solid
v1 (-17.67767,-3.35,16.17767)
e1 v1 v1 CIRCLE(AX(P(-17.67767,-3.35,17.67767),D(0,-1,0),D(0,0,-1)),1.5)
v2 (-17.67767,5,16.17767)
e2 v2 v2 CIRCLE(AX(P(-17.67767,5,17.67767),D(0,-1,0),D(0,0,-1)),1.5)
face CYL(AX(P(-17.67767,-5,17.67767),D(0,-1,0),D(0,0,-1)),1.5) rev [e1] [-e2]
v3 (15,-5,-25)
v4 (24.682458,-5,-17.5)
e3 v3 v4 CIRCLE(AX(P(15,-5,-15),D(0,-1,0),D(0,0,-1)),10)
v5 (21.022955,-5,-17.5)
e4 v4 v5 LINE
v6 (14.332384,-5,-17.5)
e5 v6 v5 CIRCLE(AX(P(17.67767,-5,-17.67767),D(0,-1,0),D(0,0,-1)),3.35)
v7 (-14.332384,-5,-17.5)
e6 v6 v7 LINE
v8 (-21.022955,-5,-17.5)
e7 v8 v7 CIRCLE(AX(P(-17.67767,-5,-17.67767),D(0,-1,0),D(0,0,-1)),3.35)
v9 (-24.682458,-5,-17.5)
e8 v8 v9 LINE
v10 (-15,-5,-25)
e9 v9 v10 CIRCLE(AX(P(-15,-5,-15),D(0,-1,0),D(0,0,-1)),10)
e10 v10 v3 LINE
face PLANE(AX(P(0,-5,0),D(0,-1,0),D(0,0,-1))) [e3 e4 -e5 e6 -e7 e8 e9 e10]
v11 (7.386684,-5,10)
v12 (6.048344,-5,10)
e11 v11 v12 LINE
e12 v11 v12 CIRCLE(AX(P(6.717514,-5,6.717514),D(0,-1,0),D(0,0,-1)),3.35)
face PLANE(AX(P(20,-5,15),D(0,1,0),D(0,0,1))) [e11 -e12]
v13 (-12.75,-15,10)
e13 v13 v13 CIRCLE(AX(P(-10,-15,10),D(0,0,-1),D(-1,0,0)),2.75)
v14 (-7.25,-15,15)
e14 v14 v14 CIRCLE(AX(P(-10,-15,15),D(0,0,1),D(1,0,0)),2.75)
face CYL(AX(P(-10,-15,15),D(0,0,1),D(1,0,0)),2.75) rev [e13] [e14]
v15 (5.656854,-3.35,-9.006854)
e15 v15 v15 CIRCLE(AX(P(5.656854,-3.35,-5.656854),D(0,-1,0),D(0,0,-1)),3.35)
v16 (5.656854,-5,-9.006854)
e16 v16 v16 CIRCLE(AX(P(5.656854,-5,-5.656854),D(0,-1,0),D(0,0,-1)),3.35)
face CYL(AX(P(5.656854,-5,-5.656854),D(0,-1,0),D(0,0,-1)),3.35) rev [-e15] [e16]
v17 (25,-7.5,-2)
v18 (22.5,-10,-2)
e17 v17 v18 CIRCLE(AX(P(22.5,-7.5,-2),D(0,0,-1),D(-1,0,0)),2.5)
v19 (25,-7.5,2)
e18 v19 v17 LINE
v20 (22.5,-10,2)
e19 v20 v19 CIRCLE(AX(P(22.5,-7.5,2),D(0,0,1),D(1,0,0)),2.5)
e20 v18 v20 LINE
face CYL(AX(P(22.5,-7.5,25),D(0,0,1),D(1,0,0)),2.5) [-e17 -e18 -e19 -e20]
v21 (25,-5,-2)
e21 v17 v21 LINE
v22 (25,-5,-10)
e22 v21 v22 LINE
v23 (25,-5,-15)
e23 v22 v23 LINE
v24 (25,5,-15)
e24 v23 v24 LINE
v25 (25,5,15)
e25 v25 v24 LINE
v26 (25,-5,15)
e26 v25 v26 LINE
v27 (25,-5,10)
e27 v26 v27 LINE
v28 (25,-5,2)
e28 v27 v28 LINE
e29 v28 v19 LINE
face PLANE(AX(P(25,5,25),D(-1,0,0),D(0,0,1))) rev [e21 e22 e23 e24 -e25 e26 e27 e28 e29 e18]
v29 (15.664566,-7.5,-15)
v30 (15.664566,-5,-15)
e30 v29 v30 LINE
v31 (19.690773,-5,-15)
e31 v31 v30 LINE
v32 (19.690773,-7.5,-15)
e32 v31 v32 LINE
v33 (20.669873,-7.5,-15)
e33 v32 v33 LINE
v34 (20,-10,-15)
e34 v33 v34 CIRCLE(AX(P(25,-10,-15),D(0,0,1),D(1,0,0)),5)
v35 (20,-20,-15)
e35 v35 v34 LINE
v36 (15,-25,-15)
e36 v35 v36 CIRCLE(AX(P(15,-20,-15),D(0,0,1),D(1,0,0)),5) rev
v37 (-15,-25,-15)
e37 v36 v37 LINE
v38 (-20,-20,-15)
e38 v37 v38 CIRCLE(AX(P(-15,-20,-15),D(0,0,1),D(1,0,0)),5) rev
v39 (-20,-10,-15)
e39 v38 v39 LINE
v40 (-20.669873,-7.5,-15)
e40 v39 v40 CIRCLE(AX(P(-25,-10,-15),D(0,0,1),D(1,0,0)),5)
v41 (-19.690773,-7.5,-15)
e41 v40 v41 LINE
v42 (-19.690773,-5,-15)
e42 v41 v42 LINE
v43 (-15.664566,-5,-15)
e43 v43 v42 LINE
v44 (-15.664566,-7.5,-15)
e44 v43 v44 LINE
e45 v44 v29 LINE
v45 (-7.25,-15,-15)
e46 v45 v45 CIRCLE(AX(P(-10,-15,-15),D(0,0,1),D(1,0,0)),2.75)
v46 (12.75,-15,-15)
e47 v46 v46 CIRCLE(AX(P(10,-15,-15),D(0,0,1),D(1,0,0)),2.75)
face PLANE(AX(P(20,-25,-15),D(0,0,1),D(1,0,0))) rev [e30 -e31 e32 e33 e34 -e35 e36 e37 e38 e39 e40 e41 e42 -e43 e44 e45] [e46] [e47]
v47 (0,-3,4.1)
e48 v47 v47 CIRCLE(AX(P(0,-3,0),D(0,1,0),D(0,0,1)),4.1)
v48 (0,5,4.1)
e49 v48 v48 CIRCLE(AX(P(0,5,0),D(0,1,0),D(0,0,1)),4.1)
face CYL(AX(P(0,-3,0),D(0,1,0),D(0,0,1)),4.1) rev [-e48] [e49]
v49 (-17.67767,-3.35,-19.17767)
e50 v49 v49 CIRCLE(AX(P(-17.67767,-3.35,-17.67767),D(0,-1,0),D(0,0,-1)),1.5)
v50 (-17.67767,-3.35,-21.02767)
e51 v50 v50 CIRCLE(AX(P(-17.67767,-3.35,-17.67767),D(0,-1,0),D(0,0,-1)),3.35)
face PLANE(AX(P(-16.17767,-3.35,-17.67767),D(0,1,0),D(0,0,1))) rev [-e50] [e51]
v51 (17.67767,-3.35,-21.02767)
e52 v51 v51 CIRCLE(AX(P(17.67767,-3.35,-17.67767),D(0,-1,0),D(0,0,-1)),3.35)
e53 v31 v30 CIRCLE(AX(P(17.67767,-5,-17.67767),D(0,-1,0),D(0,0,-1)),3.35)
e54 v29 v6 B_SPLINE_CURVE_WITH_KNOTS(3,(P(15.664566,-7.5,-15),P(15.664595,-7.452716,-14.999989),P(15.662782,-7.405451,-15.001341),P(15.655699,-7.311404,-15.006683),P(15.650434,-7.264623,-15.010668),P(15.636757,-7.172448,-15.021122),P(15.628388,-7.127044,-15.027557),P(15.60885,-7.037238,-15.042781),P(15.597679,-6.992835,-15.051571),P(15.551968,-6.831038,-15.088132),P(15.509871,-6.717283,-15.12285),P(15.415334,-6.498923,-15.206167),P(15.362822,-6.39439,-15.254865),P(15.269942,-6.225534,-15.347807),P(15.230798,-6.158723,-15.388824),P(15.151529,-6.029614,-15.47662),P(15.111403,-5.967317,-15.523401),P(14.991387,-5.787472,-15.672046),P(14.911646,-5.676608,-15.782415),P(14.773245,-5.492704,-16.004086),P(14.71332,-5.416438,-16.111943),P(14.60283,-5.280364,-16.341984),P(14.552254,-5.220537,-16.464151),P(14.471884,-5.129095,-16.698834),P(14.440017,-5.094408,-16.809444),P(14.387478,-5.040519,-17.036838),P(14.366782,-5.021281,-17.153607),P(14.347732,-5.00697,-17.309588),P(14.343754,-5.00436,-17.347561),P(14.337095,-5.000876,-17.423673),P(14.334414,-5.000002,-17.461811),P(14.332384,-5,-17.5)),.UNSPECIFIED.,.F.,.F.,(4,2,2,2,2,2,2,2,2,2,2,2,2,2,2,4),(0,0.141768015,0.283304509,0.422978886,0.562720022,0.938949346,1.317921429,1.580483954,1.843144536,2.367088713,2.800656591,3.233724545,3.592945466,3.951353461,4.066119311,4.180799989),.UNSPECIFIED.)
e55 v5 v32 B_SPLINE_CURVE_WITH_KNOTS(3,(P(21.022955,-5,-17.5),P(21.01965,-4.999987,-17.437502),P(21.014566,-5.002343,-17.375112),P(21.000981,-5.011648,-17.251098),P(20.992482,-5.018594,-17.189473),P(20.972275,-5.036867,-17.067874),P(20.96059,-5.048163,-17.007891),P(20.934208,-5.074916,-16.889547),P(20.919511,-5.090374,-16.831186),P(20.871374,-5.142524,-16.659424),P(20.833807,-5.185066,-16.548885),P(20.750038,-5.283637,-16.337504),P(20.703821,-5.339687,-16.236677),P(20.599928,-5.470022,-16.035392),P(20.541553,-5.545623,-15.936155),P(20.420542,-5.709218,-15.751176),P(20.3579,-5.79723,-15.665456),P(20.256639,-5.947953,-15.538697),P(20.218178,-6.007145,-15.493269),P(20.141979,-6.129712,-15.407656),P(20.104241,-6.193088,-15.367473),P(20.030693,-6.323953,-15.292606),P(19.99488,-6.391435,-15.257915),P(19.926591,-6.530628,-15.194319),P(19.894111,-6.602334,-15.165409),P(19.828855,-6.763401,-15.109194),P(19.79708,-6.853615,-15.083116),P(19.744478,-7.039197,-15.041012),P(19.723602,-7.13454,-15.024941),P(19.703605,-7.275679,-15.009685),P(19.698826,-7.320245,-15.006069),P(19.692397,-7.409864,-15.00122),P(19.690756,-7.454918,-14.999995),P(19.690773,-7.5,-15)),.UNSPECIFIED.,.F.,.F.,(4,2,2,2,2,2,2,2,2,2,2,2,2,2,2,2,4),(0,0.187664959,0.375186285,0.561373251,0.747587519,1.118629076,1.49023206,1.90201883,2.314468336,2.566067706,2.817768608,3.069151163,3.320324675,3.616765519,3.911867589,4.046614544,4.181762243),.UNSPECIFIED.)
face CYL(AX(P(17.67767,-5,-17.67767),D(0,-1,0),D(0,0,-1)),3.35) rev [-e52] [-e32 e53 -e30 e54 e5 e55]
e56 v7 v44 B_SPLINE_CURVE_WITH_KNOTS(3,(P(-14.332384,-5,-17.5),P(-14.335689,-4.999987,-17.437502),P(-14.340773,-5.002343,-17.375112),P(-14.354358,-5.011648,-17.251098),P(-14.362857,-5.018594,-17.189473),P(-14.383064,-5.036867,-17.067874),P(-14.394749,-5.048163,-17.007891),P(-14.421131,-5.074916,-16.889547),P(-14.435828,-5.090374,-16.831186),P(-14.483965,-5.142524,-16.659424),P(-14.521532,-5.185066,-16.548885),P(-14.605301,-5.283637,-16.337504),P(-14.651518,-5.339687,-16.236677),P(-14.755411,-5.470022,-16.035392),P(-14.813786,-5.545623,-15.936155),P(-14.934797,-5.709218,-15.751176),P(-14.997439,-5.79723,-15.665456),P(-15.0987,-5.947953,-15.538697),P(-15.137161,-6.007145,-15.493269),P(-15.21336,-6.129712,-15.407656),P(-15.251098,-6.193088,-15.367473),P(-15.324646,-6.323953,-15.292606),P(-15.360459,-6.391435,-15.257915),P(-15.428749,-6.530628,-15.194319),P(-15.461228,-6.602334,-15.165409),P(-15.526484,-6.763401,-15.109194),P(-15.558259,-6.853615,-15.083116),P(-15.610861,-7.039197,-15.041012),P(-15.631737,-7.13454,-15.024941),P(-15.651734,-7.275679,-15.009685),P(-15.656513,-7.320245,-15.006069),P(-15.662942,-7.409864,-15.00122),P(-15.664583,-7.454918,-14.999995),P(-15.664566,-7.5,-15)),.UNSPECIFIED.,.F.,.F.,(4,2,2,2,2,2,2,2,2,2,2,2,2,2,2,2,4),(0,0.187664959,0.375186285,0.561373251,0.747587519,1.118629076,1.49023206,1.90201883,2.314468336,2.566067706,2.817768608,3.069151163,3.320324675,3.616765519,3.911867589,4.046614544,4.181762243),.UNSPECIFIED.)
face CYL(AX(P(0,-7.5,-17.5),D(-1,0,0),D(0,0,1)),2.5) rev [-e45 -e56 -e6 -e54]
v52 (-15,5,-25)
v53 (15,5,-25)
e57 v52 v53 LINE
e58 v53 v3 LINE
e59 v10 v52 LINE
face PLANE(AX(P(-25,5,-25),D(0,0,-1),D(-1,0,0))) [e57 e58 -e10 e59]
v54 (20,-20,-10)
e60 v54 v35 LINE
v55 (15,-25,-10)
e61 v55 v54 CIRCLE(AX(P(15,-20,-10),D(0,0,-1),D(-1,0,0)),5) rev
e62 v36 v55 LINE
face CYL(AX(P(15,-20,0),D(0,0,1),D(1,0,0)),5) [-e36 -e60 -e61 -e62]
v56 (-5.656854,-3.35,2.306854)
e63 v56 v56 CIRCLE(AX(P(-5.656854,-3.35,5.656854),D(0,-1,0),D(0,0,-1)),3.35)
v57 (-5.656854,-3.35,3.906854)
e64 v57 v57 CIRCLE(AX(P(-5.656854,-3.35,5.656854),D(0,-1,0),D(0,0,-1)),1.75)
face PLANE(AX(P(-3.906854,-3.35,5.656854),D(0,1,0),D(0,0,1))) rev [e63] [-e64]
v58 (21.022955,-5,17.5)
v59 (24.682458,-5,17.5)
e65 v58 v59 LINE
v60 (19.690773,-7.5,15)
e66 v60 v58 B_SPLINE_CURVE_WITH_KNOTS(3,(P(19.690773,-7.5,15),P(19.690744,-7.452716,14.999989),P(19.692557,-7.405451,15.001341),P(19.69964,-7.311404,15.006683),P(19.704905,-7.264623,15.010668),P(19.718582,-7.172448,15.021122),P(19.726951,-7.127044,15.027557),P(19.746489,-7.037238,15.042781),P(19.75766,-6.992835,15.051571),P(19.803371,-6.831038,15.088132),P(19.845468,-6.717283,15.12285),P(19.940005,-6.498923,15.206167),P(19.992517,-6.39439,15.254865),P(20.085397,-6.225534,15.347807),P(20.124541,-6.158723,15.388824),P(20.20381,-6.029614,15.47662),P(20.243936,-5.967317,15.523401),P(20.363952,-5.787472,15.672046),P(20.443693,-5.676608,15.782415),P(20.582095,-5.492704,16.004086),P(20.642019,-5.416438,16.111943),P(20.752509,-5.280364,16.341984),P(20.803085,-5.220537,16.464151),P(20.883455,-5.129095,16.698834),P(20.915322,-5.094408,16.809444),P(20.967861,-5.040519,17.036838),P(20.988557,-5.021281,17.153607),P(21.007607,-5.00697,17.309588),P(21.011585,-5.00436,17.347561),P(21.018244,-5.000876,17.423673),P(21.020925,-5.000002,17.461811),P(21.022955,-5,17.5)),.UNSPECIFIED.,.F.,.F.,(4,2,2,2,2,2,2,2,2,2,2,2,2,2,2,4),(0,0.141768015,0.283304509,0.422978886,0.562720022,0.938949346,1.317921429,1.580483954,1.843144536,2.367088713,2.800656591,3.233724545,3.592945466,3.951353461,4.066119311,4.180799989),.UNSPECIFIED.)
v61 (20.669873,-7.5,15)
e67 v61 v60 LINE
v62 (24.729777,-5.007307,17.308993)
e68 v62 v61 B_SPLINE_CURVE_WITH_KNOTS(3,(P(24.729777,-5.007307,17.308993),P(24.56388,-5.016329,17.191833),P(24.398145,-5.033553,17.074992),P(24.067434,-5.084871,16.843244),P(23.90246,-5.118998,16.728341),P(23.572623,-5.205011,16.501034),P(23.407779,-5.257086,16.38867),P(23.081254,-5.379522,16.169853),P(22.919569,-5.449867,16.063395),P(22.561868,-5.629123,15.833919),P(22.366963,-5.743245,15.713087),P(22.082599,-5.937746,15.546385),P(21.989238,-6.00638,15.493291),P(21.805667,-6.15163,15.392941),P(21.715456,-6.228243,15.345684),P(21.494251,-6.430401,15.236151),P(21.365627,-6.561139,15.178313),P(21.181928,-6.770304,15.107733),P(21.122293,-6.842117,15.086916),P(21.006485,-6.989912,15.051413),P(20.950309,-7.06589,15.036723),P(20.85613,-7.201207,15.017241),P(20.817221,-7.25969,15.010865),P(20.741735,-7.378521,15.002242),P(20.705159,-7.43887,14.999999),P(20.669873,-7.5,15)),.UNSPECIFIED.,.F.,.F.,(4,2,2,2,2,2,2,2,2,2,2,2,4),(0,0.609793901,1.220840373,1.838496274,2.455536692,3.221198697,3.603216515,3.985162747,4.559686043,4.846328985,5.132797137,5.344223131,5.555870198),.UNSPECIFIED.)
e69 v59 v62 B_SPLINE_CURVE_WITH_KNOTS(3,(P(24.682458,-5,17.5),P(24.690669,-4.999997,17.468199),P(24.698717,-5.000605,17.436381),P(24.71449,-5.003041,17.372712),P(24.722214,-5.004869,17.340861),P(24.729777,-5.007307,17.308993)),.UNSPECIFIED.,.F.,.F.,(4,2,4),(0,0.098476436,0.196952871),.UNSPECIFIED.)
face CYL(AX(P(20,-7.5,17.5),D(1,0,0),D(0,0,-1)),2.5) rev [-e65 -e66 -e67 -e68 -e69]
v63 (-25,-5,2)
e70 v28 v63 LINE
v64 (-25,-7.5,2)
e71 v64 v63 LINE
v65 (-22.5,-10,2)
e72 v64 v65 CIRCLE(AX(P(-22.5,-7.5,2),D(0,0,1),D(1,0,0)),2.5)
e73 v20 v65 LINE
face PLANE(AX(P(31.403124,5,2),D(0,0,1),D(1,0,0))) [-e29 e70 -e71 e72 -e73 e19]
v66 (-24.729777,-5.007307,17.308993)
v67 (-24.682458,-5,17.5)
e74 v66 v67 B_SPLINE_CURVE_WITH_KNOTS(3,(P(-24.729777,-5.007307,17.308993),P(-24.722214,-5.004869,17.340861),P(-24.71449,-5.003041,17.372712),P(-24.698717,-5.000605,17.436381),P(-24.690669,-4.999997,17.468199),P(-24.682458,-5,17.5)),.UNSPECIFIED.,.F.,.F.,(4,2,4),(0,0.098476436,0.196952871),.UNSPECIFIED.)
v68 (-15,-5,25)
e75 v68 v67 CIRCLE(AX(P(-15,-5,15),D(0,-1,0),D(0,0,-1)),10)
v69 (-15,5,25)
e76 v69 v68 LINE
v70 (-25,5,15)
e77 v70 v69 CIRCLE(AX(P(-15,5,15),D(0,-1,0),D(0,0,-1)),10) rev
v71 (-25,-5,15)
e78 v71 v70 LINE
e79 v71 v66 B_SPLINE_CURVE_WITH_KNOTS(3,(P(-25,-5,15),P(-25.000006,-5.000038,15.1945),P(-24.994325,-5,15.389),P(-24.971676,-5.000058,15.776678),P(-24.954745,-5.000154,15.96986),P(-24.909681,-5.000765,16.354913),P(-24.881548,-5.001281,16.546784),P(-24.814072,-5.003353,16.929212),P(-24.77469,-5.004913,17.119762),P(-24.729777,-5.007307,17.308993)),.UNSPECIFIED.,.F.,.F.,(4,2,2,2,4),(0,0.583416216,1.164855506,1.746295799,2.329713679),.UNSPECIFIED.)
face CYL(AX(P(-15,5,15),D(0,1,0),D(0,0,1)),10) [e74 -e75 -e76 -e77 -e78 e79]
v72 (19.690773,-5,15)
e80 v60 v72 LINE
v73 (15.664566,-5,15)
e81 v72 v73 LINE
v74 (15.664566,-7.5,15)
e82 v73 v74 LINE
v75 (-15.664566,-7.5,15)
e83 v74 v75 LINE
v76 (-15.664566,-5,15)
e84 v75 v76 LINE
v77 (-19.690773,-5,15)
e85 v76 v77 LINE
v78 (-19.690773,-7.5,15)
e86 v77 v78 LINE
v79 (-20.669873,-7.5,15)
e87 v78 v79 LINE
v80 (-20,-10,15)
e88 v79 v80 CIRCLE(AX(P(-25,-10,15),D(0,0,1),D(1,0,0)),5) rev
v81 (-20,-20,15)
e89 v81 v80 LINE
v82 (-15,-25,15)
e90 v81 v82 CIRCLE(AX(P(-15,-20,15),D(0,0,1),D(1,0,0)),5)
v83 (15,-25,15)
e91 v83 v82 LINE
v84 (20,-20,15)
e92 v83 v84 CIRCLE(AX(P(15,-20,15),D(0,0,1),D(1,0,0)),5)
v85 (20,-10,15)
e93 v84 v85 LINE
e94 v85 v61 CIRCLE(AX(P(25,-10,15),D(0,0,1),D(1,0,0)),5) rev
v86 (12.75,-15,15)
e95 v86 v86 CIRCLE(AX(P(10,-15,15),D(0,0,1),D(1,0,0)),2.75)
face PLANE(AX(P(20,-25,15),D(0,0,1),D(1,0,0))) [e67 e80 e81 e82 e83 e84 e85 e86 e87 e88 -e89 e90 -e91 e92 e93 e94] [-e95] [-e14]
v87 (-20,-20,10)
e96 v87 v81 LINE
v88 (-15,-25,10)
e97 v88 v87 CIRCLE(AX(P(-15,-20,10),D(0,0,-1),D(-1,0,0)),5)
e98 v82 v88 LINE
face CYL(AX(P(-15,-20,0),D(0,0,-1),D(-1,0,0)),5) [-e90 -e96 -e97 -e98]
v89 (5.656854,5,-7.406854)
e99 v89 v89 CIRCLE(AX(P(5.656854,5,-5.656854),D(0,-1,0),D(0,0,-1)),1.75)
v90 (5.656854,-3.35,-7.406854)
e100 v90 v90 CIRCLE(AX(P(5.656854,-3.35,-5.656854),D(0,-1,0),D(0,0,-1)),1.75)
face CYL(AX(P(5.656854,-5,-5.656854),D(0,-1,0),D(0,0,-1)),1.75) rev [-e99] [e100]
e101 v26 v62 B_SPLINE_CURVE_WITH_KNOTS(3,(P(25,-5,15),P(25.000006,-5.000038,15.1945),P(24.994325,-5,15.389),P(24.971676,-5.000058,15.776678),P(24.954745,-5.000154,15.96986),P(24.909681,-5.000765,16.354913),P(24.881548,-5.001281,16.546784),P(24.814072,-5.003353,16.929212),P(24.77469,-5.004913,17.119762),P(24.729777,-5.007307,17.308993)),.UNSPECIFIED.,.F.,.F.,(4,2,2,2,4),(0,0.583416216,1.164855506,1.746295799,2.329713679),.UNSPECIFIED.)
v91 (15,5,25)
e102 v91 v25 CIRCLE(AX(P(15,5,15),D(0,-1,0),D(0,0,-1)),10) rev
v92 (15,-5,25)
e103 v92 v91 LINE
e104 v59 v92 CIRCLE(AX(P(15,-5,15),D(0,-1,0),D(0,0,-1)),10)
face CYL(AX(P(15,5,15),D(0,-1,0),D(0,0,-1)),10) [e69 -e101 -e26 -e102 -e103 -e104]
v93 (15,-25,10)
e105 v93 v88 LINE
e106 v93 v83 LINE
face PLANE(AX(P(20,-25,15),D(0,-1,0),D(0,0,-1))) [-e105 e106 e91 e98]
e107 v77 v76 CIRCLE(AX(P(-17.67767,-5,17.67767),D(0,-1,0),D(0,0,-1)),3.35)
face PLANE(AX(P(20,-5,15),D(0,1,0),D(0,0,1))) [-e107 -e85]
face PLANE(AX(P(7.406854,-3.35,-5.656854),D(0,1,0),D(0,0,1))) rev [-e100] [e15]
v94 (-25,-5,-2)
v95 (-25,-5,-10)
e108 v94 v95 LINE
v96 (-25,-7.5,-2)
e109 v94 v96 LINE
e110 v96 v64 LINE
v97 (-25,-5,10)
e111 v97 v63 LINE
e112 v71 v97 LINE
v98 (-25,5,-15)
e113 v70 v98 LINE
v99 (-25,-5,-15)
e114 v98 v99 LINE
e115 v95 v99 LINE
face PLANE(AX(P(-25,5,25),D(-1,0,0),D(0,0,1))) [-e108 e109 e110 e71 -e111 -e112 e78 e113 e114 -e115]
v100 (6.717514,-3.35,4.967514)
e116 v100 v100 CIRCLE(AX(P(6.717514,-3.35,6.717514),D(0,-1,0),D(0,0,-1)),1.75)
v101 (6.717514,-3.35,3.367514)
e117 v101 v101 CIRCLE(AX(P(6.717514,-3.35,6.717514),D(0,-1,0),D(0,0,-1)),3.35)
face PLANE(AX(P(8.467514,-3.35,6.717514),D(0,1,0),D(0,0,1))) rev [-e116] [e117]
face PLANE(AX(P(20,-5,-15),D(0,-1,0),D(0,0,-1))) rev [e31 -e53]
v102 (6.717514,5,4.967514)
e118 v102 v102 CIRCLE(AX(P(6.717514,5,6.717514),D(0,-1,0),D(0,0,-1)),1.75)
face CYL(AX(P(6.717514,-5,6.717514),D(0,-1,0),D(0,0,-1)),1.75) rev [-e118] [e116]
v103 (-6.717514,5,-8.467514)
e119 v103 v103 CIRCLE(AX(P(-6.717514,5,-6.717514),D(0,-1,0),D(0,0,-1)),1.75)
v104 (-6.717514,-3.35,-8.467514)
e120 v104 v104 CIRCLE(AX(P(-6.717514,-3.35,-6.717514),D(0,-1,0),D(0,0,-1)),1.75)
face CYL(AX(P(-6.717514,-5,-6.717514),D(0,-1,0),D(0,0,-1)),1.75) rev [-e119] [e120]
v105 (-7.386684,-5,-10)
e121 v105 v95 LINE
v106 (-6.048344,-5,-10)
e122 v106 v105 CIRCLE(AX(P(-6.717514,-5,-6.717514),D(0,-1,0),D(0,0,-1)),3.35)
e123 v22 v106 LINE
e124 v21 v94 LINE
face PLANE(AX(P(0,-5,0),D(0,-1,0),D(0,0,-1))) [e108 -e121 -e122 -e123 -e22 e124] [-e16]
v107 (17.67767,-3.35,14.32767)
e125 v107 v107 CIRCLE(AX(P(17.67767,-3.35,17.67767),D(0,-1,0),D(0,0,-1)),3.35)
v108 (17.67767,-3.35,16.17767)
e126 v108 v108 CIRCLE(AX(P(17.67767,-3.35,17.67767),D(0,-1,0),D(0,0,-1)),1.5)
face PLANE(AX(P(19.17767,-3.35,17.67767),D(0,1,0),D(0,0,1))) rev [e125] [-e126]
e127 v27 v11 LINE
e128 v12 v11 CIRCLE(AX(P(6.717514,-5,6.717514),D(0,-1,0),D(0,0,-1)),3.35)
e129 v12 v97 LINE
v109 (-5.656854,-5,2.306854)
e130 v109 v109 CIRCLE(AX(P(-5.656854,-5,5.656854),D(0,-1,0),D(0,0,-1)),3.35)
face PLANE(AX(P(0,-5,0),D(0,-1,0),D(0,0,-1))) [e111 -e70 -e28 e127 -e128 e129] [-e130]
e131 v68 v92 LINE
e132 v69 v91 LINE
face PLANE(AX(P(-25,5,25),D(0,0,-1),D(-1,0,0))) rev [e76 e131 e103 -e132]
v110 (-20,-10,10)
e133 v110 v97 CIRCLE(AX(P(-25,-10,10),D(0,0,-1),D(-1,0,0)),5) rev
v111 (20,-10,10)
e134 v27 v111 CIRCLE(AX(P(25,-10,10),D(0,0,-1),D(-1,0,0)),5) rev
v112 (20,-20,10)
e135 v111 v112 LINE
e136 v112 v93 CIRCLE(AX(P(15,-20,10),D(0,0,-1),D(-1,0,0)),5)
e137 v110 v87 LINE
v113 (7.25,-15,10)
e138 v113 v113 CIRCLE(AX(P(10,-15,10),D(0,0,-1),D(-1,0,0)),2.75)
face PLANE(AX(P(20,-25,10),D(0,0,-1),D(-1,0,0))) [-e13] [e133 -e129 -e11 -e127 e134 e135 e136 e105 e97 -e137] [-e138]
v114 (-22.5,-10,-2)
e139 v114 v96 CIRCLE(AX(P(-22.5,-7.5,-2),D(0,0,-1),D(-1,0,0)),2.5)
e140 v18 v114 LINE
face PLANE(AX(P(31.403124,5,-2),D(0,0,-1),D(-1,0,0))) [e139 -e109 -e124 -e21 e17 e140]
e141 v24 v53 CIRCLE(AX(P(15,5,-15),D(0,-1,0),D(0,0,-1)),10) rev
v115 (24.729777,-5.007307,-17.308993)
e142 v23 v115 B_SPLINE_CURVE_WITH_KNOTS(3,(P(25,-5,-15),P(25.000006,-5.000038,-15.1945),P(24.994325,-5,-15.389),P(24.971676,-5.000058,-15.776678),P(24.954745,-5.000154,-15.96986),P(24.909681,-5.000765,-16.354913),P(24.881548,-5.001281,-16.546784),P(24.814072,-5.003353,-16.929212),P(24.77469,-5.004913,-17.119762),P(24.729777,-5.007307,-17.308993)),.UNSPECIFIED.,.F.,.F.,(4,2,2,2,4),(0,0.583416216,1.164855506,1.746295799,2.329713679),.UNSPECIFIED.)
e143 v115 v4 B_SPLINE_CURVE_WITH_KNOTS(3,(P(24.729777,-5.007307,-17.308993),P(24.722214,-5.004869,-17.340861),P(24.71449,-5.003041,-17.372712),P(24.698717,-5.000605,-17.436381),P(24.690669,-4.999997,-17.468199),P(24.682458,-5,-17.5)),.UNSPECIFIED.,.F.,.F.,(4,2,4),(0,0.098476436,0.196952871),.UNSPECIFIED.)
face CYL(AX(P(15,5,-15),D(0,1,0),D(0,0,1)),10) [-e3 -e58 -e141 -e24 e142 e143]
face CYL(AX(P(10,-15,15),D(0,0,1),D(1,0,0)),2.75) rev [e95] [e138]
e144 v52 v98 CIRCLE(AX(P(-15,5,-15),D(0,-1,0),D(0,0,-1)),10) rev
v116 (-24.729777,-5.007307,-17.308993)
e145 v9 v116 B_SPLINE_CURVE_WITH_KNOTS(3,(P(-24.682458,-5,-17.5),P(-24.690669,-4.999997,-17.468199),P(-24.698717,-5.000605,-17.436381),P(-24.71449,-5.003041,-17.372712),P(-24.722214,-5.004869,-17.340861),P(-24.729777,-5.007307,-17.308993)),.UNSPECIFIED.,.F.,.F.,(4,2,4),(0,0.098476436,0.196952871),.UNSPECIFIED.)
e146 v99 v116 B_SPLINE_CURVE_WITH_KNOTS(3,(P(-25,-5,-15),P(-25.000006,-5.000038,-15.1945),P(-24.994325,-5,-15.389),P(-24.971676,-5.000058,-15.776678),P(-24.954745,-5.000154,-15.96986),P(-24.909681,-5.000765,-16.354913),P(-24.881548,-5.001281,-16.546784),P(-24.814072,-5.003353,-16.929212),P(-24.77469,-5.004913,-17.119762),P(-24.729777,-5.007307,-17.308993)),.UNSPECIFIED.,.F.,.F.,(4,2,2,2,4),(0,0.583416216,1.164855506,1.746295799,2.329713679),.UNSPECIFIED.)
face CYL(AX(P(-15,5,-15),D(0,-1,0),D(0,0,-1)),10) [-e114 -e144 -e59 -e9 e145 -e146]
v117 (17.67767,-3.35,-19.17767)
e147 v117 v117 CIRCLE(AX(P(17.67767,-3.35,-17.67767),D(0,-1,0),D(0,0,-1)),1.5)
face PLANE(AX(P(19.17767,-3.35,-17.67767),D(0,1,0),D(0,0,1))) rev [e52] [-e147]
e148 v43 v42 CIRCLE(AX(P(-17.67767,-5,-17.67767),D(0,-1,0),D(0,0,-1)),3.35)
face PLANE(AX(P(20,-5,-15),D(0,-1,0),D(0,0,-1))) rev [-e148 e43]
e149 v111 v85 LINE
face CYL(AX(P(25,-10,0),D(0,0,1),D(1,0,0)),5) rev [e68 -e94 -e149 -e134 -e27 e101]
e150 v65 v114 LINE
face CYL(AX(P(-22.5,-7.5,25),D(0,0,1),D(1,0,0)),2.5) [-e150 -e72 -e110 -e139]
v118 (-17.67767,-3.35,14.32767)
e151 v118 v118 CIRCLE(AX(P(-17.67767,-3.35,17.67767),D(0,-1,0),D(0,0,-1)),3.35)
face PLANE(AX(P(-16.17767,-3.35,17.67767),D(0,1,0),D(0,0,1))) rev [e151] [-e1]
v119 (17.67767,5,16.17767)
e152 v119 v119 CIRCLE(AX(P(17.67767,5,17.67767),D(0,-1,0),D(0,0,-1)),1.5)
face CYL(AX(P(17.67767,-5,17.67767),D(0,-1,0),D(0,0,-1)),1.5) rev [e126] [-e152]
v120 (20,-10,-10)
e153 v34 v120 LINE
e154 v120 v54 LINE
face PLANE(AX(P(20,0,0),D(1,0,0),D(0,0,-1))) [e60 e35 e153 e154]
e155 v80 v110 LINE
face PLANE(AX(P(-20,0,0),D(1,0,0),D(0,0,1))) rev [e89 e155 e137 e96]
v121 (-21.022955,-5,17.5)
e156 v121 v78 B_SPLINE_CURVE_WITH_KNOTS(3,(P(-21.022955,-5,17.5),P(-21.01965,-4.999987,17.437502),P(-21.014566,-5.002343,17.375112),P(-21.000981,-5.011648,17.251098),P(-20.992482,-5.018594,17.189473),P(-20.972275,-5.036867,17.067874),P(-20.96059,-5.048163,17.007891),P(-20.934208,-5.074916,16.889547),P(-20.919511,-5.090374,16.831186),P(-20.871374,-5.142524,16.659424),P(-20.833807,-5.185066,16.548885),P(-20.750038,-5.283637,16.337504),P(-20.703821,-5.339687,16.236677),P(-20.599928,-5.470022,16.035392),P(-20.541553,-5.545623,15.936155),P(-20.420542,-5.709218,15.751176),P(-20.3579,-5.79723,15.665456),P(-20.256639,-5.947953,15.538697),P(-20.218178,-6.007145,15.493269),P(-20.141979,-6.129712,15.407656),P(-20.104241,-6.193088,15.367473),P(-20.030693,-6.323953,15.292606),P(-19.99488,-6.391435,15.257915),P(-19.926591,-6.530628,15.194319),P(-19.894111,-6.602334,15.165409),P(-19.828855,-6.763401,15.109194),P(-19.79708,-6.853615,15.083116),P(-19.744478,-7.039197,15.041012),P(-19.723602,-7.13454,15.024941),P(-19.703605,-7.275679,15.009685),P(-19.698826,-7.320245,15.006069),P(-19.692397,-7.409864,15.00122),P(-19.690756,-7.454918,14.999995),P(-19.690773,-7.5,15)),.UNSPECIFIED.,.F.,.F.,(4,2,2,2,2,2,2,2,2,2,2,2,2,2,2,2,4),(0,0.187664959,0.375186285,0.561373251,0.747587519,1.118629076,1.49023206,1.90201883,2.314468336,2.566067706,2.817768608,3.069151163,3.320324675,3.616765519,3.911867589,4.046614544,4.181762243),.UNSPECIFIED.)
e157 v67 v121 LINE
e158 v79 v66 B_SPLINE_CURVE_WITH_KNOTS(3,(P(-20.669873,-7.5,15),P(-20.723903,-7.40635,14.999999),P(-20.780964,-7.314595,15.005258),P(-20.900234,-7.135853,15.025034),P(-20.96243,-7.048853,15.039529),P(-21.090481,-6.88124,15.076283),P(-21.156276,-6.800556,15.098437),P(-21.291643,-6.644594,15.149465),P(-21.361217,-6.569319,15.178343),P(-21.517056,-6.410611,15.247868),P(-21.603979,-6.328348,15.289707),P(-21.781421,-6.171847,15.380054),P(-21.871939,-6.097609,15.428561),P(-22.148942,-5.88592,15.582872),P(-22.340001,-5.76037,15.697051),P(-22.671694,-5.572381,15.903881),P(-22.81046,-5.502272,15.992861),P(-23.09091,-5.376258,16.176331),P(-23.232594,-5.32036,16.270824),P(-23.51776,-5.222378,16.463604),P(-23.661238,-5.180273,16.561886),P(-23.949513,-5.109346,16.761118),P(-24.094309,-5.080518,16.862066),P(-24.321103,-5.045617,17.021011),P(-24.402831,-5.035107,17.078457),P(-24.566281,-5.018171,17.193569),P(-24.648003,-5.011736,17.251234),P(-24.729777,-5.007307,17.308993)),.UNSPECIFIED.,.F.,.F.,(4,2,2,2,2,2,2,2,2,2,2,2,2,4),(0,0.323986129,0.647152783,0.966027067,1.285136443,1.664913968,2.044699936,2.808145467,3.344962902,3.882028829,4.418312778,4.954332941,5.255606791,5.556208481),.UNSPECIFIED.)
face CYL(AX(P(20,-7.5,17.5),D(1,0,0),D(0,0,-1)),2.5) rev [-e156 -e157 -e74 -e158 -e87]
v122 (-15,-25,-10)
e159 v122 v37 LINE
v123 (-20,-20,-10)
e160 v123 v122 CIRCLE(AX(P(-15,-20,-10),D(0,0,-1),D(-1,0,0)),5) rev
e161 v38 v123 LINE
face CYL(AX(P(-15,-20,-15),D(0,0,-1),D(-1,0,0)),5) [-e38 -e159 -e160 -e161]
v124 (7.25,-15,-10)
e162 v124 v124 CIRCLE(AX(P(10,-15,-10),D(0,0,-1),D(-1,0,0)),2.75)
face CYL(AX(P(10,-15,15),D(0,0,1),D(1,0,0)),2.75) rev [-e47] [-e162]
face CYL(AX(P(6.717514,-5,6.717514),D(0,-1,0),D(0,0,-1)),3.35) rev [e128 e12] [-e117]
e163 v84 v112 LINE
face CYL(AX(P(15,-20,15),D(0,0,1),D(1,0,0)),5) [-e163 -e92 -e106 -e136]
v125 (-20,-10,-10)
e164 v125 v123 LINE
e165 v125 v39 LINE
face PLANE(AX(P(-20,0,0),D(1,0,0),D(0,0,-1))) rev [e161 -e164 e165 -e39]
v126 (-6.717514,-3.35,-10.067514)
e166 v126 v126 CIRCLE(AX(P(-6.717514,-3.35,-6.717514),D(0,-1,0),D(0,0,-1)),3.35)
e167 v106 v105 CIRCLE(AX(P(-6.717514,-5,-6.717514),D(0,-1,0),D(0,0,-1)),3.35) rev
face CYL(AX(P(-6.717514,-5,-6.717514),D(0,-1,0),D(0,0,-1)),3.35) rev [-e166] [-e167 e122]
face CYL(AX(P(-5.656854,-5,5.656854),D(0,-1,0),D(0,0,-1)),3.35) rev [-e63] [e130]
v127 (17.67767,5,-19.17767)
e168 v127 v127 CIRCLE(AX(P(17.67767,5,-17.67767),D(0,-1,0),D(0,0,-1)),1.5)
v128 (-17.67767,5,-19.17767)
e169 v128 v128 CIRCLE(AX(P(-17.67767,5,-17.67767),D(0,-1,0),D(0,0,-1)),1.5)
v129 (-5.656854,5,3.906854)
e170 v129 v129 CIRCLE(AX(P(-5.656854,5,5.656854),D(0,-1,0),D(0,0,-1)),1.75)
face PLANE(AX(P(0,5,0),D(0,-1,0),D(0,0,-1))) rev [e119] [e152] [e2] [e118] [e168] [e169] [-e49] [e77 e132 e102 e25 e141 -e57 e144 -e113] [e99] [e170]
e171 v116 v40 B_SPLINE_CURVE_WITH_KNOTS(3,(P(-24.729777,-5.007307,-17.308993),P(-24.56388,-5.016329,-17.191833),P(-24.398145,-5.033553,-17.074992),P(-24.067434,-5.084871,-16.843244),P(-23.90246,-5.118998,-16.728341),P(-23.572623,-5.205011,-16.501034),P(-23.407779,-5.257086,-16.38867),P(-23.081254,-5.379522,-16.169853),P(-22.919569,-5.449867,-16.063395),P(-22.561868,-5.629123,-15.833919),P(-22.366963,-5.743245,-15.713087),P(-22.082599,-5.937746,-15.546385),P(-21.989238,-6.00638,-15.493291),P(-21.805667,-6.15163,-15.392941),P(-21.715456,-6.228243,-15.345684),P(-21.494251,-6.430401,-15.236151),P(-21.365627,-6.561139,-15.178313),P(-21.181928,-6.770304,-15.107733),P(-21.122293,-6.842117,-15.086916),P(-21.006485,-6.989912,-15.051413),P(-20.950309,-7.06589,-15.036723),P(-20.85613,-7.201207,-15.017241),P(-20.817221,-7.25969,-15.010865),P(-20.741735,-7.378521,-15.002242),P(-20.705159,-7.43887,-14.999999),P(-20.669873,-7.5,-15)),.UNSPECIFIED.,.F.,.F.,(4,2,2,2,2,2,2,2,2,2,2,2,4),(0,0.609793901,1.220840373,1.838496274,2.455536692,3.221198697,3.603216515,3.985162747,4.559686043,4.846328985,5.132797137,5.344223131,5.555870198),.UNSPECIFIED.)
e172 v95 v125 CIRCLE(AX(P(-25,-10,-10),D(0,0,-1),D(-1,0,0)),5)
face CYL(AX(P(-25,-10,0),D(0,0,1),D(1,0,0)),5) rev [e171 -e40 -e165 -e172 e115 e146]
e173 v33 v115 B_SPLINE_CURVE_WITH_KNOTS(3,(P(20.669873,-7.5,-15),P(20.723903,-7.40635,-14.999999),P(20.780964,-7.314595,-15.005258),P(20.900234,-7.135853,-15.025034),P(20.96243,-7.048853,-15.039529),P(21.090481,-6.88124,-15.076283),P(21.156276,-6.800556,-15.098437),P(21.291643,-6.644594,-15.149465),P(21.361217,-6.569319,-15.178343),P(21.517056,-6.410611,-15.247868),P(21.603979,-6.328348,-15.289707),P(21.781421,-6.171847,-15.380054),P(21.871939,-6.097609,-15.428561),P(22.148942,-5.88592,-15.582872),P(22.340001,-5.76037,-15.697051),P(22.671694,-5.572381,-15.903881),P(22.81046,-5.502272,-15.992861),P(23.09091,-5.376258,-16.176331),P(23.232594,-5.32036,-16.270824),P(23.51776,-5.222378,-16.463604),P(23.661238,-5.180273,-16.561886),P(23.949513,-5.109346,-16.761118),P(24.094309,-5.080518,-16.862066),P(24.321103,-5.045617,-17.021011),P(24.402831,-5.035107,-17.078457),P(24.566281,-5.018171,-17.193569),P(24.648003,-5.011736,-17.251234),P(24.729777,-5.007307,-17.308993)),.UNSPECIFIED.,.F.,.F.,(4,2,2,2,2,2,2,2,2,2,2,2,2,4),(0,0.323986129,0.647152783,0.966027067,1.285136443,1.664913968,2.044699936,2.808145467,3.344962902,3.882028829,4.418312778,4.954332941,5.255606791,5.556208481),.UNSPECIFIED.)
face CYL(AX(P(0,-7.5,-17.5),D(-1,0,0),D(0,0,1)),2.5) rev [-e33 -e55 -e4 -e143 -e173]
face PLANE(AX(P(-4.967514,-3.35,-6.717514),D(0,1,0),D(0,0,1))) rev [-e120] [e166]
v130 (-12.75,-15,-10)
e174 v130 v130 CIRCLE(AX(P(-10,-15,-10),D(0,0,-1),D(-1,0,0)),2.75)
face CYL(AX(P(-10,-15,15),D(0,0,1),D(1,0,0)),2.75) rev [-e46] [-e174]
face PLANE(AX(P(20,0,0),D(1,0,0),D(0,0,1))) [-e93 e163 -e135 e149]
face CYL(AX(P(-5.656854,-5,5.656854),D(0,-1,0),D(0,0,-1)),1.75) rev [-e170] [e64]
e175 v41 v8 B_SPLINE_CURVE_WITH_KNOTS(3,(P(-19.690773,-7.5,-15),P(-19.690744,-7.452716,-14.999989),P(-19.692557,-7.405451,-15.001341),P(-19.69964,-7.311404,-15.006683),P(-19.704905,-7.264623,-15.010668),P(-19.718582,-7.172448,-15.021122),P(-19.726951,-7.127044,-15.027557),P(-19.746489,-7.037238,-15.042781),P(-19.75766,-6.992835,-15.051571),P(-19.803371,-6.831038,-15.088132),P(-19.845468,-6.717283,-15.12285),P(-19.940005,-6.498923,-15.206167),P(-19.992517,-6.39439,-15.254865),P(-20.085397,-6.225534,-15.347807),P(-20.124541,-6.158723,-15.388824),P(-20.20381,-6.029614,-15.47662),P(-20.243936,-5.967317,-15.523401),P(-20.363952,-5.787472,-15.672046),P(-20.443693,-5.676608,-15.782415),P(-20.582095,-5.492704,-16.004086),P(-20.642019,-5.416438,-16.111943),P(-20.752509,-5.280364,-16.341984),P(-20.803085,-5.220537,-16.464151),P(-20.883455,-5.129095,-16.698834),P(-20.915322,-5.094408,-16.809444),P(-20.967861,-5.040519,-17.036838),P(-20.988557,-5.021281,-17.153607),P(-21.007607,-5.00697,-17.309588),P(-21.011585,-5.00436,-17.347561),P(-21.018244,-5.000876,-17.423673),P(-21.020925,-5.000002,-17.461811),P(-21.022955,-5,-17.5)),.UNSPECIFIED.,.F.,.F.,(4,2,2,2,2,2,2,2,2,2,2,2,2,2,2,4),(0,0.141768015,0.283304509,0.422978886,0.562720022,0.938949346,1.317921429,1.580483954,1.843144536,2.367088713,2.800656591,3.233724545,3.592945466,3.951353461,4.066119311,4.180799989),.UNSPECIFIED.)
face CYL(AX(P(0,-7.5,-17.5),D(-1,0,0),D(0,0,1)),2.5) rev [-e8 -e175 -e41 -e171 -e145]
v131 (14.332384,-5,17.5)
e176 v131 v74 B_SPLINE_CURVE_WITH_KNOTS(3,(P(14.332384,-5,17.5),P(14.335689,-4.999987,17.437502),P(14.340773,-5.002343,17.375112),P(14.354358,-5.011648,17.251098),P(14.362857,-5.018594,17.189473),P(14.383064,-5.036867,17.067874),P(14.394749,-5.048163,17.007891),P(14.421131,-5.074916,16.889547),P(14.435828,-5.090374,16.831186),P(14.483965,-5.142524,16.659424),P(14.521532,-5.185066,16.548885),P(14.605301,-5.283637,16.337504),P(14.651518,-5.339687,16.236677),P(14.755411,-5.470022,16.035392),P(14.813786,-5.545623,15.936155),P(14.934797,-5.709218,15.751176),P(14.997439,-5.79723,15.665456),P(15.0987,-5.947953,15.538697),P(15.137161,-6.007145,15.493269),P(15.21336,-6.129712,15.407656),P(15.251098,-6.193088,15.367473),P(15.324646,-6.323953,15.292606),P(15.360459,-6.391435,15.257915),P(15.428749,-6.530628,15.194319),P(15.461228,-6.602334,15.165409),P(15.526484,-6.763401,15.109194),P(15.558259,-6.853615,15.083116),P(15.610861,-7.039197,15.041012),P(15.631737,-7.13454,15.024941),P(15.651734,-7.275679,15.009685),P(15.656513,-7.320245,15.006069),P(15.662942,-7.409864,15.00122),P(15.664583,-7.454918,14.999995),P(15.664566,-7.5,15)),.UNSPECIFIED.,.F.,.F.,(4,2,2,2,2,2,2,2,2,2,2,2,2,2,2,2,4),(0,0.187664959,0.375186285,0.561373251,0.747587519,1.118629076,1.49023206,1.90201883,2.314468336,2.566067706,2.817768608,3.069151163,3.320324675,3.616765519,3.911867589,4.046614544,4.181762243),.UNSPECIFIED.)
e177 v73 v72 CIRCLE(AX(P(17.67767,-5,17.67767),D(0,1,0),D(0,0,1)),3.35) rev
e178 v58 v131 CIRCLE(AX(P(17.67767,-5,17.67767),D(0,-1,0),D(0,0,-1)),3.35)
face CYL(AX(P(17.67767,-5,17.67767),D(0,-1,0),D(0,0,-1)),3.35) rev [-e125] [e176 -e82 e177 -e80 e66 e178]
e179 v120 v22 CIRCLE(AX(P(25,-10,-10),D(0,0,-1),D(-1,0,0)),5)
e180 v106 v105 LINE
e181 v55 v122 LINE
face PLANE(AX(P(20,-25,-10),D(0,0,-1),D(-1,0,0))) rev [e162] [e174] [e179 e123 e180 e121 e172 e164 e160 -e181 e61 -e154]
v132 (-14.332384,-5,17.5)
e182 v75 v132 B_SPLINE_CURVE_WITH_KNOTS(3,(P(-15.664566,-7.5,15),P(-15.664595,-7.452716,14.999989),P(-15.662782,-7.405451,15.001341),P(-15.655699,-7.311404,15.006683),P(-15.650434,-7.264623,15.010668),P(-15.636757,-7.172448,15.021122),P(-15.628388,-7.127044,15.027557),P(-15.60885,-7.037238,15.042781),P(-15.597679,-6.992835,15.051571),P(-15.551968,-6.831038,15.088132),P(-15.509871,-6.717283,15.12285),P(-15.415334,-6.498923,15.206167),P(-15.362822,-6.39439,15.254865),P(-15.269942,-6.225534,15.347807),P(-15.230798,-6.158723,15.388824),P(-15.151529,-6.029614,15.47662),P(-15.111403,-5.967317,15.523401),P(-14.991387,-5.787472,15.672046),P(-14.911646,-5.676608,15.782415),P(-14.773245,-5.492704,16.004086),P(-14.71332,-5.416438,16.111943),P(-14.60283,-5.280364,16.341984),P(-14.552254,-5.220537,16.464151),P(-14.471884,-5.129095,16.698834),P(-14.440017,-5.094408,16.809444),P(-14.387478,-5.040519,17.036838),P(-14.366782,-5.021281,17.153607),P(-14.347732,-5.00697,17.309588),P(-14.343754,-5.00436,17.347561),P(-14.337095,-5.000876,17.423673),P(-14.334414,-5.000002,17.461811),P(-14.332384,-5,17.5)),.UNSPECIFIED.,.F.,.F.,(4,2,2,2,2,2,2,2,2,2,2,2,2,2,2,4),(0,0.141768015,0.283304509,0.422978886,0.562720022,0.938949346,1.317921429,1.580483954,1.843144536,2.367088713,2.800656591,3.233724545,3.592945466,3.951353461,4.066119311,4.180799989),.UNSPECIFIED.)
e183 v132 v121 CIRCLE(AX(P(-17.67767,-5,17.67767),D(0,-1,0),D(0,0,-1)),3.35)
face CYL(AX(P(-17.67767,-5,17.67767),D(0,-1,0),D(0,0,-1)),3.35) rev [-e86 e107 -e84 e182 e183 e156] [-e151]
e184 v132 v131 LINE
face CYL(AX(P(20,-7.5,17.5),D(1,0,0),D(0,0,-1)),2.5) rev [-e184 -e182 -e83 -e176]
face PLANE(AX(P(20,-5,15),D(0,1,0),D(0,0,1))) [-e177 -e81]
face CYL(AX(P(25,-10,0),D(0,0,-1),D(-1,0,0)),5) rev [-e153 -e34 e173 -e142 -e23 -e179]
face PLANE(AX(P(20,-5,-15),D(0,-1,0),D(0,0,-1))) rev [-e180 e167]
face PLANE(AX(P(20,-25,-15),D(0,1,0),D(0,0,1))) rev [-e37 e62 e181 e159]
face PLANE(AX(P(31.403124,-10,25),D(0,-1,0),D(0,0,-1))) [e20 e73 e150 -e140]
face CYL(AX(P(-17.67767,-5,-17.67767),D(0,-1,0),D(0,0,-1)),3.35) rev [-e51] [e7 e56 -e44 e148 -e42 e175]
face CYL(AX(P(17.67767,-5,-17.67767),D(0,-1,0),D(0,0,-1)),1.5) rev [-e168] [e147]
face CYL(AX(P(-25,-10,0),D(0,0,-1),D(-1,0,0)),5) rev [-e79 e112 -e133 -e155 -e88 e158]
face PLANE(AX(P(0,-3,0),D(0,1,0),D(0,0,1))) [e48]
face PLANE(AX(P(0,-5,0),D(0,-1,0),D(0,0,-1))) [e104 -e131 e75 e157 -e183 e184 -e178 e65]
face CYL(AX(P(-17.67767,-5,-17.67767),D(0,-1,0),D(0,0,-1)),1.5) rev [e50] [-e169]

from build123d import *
from build123d.topology import SkipClean

# Parameters (mm, degrees)
SKETCH1_W                       = 50
SKETCH1_H                       = 50
BOSS_EXTRUDE1_DEPTH             = 5
BOSS_EXTRUDE3_START             = -25
SKETCH4_W                       = 4
SKETCH4_H                       = 5
BOSS_EXTRUDE3_DEPTH             = 50
CBORE_FOR_M3_SBHCS1_D           = 3.5
CBORE_FOR_M3_SBHCS1_DEPTH       = 10.76
CBORE_FOR_M3_SBHCS1_CBORE_D     = 6.7
CBORE_FOR_M3_SBHCS1_CBORE_DEPTH = 1.65
CBORE_FOR_M3_SBHCS1_TIP         = 1.051506083
CBORE_FOR_M3_SBHCS2_D           = 3
CBORE_FOR_M3_SBHCS2_DEPTH       = 10.76
CBORE_FOR_M3_SBHCS2_CBORE_D     = 6.7
CBORE_FOR_M3_SBHCS2_CBORE_DEPTH = 1.65
CBORE_FOR_M3_SBHCS2_TIP         = 0.901290929
SKETCH19_W                      = 5
SKETCH19_H                      = 20
BOSS_EXTRUDE4_DEPTH             = 20
M5_CLEARANCE_HOLE1_D            = 5.5
FILLET1_R                       = 10
FILLET2_R                       = 5
FILLET3_R                       = 5
FILLET4_R                       = 2.5
FILLET5_R                       = 2.5
SKETCH24_R                      = 4.1
CUT_EXTRUDE1_DEPTH              = 8


# Some blends are built 0.0001 mm under size
with BuildPart() as part:
    # Sketch1 → Boss-Extrude1 (new, symmetric)
    with BuildSketch(Plane(origin=(0, 0, 0), x_dir=(1, 0, 0), z_dir=(0, 1, 0))):
        Rectangle(SKETCH1_W, SKETCH1_H)
    extrude(amount=BOSS_EXTRUDE1_DEPTH, both=True)

    # Sketch4 → Boss-Extrude3 (add)
    with BuildSketch(Plane(origin=(0, 0, 0), x_dir=(0, 0, -1), z_dir=(1, 0, 0)).offset(BOSS_EXTRUDE3_START)):
        with Locations((0, -7.5)):
            Rectangle(SKETCH4_W, SKETCH4_H)
    extrude(amount=BOSS_EXTRUDE3_DEPTH)

    # CBORE for M3 SBHCS1
    with Locations(Plane(origin=(0, -5, 0), x_dir=(-1, 0, 0), z_dir=(0, -1, 0))):
        with Locations((5.656854249, -5.656854249), (-6.717514421, -6.717514421), (6.717514421, 6.717514421), (-5.656854249, 5.656854249)):
            CounterBoreHole(CBORE_FOR_M3_SBHCS1_D / 2, CBORE_FOR_M3_SBHCS1_CBORE_D / 2, CBORE_FOR_M3_SBHCS1_CBORE_DEPTH, depth=CBORE_FOR_M3_SBHCS1_DEPTH)
            with Locations((0, 0, -(CBORE_FOR_M3_SBHCS1_DEPTH + CBORE_FOR_M3_SBHCS1_TIP / 2))):  # 118° drill point
                Cone(0, CBORE_FOR_M3_SBHCS1_D / 2, CBORE_FOR_M3_SBHCS1_TIP, mode=Mode.SUBTRACT)

    # CBORE for M3 SBHCS2
    with Locations(Plane(origin=(0, -5, 0), x_dir=(-1, 0, 0), z_dir=(0, -1, 0))):
        with Locations((17.67766953, 17.67766953), (17.67766953, -17.67766953), (-17.67766953, -17.67766953), (-17.67766953, 17.67766953)):
            CounterBoreHole(CBORE_FOR_M3_SBHCS2_D / 2, CBORE_FOR_M3_SBHCS2_CBORE_D / 2, CBORE_FOR_M3_SBHCS2_CBORE_DEPTH, depth=CBORE_FOR_M3_SBHCS2_DEPTH)
            with Locations((0, 0, -(CBORE_FOR_M3_SBHCS2_DEPTH + CBORE_FOR_M3_SBHCS2_TIP / 2))):  # 118° drill point
                Cone(0, CBORE_FOR_M3_SBHCS2_D / 2, CBORE_FOR_M3_SBHCS2_TIP, mode=Mode.SUBTRACT)

    # Sketch19 → Boss-Extrude4 (add, symmetric)
    with BuildSketch(Plane(origin=(0, 0, 0), x_dir=(0, 0, -1), z_dir=(1, 0, 0))):
        with Locations((12.5, -15)):
            Rectangle(SKETCH19_W, SKETCH19_H)
    boss_extrude4 = extrude(amount=BOSS_EXTRUDE4_DEPTH, both=True)

    # Mirror1: Boss-Extrude4 across plane
    add(boss_extrude4.mirror(Plane.XY))

    # M5 Clearance Hole1 (through all)
    with Locations(Plane.XY.offset(15)):
        with Locations((10, -15)):
            m5_clearance_hole1 = Hole(M5_CLEARANCE_HOLE1_D / 2)

    # Fillet1
    fillet1_edges = [part.edges().sort_by_distance(p)[0] for p in [
        (-25, 0, 25),
        (25, 0, 25),
        (25, 0, -25),
        (-25, 0, -25),
    ]]
    fillet(fillet1_edges, radius=FILLET1_R)

    # Fillet2
    fillet2_edges = [part.edges().sort_by_distance(p)[0] for p in [
        (-20, -25, -12.5),
        (20, -25, -12.5),
        (20, -25, 12.5),
        (-20, -25, 12.5),
    ]]
    fillet(fillet2_edges, radius=FILLET2_R)

    # Fillet3
    fillet3_edges = [part.edges().sort_by_distance(p)[0] for p in [
        (-20, -5, -12.5),
        (20, -5, -12.5),
        (20, -5, 12.5),
        (-20, -5, 12.5),
    ]]
    fillet(fillet3_edges, radius=FILLET3_R - 0.0001)  # a hair under: the kernel refuses the full size

    # Fillet4
    fillet4_edges = [part.edges().sort_by_distance(p)[0] for p in [
        (-25, -10, 0),
        (25, -10, 0),
    ]]
    fillet(fillet4_edges, radius=FILLET4_R)

    # Mirror2: M5 Clearance Hole1 across plane
    add(m5_clearance_hole1.mirror(Plane(origin=(0, 0, 0), x_dir=(0, 0, 1), z_dir=(1, 0, 0))), mode=Mode.SUBTRACT)

    # Fillet5
    # the kernel refuses this fillet: 2.5 mm, written as the material it adds along each edge
    with BuildSketch(Plane(origin=(31.2499, -5, -15), x_dir=(0, 0, -1), z_dir=(-1, 0, 0))) as fillet5_piece_1_section:
        with BuildLine():
            CenterArc((FILLET5_R, FILLET5_R), FILLET5_R, 180, 90)
            Line((0, FILLET5_R), (0, 0))
            Line((0, 0), (FILLET5_R, 0))
        make_face()
    fillet5_piece_1 = extrude(amount=17.809126924, mode=Mode.PRIVATE)
    fillet5_piece_1 = fillet5_piece_1 & Plane(origin=(15, -5.443084519, -15), x_dir=(1, 0, 0), z_dir=(0, 1, 0)) * Cylinder(10, 46, mode=Mode.PRIVATE)
    fillet5_piece_1 = fillet5_piece_1 - Plane(origin=(17.67766953, -5.443084519, -17.67766953), x_dir=(-1, 0, 0), z_dir=(0, -1, 0)) * Cylinder(3.35, 46, mode=Mode.PRIVATE)
    fillet5_piece_1 = fillet5_piece_1 - Plane(origin=(24.9999, -9.9999, -15.600375786), x_dir=(0, 1, 0), z_dir=(0, 0, -1)) * Cylinder(4.9999, 46, mode=Mode.PRIVATE)
    add(fillet5_piece_1)
    with BuildSketch(Plane(origin=(-21.914565984, -5, -15), x_dir=(0, 0, -1), z_dir=(1, 0, 0))) as fillet5_piece_2_section:
        with BuildLine():
            CenterArc((FILLET5_R, -FILLET5_R), FILLET5_R, 90, 90)
            Line((0, -FILLET5_R), (0, 0))
            Line((0, 0), (FILLET5_R, 0))
        make_face()
    fillet5_piece_2 = extrude(amount=43.829131967, mode=Mode.PRIVATE)
    fillet5_piece_2 = fillet5_piece_2 - Plane(origin=(-24.9999, -9.9999, -15.47958938), x_dir=(0, 1, 0), z_dir=(0, 0, -1)) * Cylinder(4.9999, 98, mode=Mode.PRIVATE)
    fillet5_piece_2 = fillet5_piece_2 - Plane(origin=(-17.67766953, -5.581152755, -17.67766953), x_dir=(-1, 0, 0), z_dir=(0, -1, 0)) * Cylinder(3.35, 98, mode=Mode.PRIVATE)
    fillet5_piece_2 = fillet5_piece_2 - Plane(origin=(17.67766953, -5.581152755, -17.67766953), x_dir=(-1, 0, 0), z_dir=(0, -1, 0)) * Cylinder(3.35, 98, mode=Mode.PRIVATE)
    fillet5_piece_2 = fillet5_piece_2 - Plane(origin=(24.9999, -9.9999, -15.47958938), x_dir=(0, 1, 0), z_dir=(0, 0, -1)) * Cylinder(4.9999, 98, mode=Mode.PRIVATE)
    add(fillet5_piece_2)
    with BuildSketch(Plane(origin=(-13.440773076, -5, -15), x_dir=(0, 0, -1), z_dir=(-1, 0, 0))) as fillet5_piece_3_section:
        with BuildLine():
            CenterArc((FILLET5_R, FILLET5_R), FILLET5_R, 180, 90)
            Line((0, FILLET5_R), (0, 0))
            Line((0, 0), (FILLET5_R, 0))
        make_face()
    fillet5_piece_3 = extrude(amount=17.809126924, mode=Mode.PRIVATE)
    fillet5_piece_3 = fillet5_piece_3 & Plane(origin=(-15, -5.616758161, -15), x_dir=(-1, 0, 0), z_dir=(0, -1, 0)) * Cylinder(10, 46, mode=Mode.PRIVATE)
    fillet5_piece_3 = fillet5_piece_3 - Plane(origin=(-24.9999, -9.9999, -15.466172453), x_dir=(0, 1, 0), z_dir=(0, 0, -1)) * Cylinder(4.9999, 46, mode=Mode.PRIVATE)
    fillet5_piece_3 = fillet5_piece_3 - Plane(origin=(-17.67766953, -5.616758161, -17.67766953), x_dir=(-1, 0, 0), z_dir=(0, -1, 0)) * Cylinder(3.35, 46, mode=Mode.PRIVATE)
    add(fillet5_piece_3)
    with BuildSketch(Plane(origin=(31.2499, -5, 15), x_dir=(0, 0, 1), z_dir=(-1, 0, 0))) as fillet5_piece_4_section:
        with BuildLine():
            CenterArc((FILLET5_R, -FILLET5_R), FILLET5_R, 90, 90)
            Line((0, -FILLET5_R), (0, 0))
            Line((0, 0), (FILLET5_R, 0))
        make_face()
    fillet5_piece_4 = extrude(amount=17.809126924, mode=Mode.PRIVATE)
    fillet5_piece_4 = fillet5_piece_4 & Plane(origin=(15, -5.443086439, 15), x_dir=(0, 0, 1), z_dir=(0, 1, 0)) * Cylinder(10, 46, mode=Mode.PRIVATE)
    fillet5_piece_4 = fillet5_piece_4 - Plane(origin=(24.9999, -9.9999, 15.600377701), x_dir=(0, 1, 0), z_dir=(0, 0, 1)) * Cylinder(4.9999, 46, mode=Mode.PRIVATE)
    fillet5_piece_4 = fillet5_piece_4 - Plane(origin=(17.67766953, -5.443086439, 17.67766953), x_dir=(-1, 0, 0), z_dir=(0, -1, 0)) * Cylinder(3.35, 46, mode=Mode.PRIVATE)
    add(fillet5_piece_4)
    with BuildSketch(Plane(origin=(-21.914565984, -5, 15), x_dir=(0, 0, 1), z_dir=(1, 0, 0))) as fillet5_piece_5_section:
        with BuildLine():
            CenterArc((FILLET5_R, FILLET5_R), FILLET5_R, 180, 90)
            Line((0, FILLET5_R), (0, 0))
            Line((0, 0), (FILLET5_R, 0))
        make_face()
    fillet5_piece_5 = extrude(amount=43.829131967, mode=Mode.PRIVATE)
    fillet5_piece_5 = fillet5_piece_5 - Plane(origin=(24.9999, -9.9999, 15.479588149), x_dir=(0, 1, 0), z_dir=(0, 0, 1)) * Cylinder(4.9999, 98, mode=Mode.PRIVATE)
    fillet5_piece_5 = fillet5_piece_5 - Plane(origin=(17.67766953, -5.581152089, 17.67766953), x_dir=(-1, 0, 0), z_dir=(0, -1, 0)) * Cylinder(3.35, 98, mode=Mode.PRIVATE)
    fillet5_piece_5 = fillet5_piece_5 - Plane(origin=(-17.67766953, -5.581152089, 17.67766953), x_dir=(-1, 0, 0), z_dir=(0, -1, 0)) * Cylinder(3.35, 98, mode=Mode.PRIVATE)
    fillet5_piece_5 = fillet5_piece_5 - Plane(origin=(-24.9999, -9.9999, 15.479588149), x_dir=(1, 0, 0), z_dir=(0, 0, 1)) * Cylinder(4.9999, 98, mode=Mode.PRIVATE)
    add(fillet5_piece_5)
    with BuildSketch(Plane(origin=(-13.440773076, -5, 15), x_dir=(0, 0, 1), z_dir=(-1, 0, 0))) as fillet5_piece_6_section:
        with BuildLine():
            CenterArc((FILLET5_R, -FILLET5_R), FILLET5_R, 90, 90)
            Line((0, -FILLET5_R), (0, 0))
            Line((0, 0), (FILLET5_R, 0))
        make_face()
    fillet5_piece_6 = extrude(amount=17.809126924, mode=Mode.PRIVATE)
    fillet5_piece_6 = fillet5_piece_6 & Plane(origin=(-15, -5.616758645, 15), x_dir=(0, 0, 1), z_dir=(0, -1, 0)) * Cylinder(10, 46, mode=Mode.PRIVATE)
    fillet5_piece_6 = fillet5_piece_6 - Plane(origin=(-17.67766953, -5.616758645, 17.67766953), x_dir=(-1, 0, 0), z_dir=(0, -1, 0)) * Cylinder(3.35, 46, mode=Mode.PRIVATE)
    fillet5_piece_6 = fillet5_piece_6 - Plane(origin=(-24.9999, -9.9999, 15.466173234), x_dir=(1, 0, 0), z_dir=(0, 0, 1)) * Cylinder(4.9999, 46, mode=Mode.PRIVATE)
    add(fillet5_piece_6)

    # Sketch24 → Cut-Extrude1 (cut)
    with SkipClean():  # the faces are left unmerged after this step: merging them gives an invalid solid
        with BuildSketch(Plane(origin=(0, 5, 0), x_dir=(1, 0, 0), z_dir=(0, 1, 0))):
            with Locations(Location((0, 0, 0), (0, 0, 270))):
                Circle(SKETCH24_R)
        extrude(amount=-CUT_EXTRUDE1_DEPTH, mode=Mode.SUBTRACT)
    add(part.part.scale(1), mode=Mode.REPLACE)  # the faces are merged on a copy


solid = part.part
